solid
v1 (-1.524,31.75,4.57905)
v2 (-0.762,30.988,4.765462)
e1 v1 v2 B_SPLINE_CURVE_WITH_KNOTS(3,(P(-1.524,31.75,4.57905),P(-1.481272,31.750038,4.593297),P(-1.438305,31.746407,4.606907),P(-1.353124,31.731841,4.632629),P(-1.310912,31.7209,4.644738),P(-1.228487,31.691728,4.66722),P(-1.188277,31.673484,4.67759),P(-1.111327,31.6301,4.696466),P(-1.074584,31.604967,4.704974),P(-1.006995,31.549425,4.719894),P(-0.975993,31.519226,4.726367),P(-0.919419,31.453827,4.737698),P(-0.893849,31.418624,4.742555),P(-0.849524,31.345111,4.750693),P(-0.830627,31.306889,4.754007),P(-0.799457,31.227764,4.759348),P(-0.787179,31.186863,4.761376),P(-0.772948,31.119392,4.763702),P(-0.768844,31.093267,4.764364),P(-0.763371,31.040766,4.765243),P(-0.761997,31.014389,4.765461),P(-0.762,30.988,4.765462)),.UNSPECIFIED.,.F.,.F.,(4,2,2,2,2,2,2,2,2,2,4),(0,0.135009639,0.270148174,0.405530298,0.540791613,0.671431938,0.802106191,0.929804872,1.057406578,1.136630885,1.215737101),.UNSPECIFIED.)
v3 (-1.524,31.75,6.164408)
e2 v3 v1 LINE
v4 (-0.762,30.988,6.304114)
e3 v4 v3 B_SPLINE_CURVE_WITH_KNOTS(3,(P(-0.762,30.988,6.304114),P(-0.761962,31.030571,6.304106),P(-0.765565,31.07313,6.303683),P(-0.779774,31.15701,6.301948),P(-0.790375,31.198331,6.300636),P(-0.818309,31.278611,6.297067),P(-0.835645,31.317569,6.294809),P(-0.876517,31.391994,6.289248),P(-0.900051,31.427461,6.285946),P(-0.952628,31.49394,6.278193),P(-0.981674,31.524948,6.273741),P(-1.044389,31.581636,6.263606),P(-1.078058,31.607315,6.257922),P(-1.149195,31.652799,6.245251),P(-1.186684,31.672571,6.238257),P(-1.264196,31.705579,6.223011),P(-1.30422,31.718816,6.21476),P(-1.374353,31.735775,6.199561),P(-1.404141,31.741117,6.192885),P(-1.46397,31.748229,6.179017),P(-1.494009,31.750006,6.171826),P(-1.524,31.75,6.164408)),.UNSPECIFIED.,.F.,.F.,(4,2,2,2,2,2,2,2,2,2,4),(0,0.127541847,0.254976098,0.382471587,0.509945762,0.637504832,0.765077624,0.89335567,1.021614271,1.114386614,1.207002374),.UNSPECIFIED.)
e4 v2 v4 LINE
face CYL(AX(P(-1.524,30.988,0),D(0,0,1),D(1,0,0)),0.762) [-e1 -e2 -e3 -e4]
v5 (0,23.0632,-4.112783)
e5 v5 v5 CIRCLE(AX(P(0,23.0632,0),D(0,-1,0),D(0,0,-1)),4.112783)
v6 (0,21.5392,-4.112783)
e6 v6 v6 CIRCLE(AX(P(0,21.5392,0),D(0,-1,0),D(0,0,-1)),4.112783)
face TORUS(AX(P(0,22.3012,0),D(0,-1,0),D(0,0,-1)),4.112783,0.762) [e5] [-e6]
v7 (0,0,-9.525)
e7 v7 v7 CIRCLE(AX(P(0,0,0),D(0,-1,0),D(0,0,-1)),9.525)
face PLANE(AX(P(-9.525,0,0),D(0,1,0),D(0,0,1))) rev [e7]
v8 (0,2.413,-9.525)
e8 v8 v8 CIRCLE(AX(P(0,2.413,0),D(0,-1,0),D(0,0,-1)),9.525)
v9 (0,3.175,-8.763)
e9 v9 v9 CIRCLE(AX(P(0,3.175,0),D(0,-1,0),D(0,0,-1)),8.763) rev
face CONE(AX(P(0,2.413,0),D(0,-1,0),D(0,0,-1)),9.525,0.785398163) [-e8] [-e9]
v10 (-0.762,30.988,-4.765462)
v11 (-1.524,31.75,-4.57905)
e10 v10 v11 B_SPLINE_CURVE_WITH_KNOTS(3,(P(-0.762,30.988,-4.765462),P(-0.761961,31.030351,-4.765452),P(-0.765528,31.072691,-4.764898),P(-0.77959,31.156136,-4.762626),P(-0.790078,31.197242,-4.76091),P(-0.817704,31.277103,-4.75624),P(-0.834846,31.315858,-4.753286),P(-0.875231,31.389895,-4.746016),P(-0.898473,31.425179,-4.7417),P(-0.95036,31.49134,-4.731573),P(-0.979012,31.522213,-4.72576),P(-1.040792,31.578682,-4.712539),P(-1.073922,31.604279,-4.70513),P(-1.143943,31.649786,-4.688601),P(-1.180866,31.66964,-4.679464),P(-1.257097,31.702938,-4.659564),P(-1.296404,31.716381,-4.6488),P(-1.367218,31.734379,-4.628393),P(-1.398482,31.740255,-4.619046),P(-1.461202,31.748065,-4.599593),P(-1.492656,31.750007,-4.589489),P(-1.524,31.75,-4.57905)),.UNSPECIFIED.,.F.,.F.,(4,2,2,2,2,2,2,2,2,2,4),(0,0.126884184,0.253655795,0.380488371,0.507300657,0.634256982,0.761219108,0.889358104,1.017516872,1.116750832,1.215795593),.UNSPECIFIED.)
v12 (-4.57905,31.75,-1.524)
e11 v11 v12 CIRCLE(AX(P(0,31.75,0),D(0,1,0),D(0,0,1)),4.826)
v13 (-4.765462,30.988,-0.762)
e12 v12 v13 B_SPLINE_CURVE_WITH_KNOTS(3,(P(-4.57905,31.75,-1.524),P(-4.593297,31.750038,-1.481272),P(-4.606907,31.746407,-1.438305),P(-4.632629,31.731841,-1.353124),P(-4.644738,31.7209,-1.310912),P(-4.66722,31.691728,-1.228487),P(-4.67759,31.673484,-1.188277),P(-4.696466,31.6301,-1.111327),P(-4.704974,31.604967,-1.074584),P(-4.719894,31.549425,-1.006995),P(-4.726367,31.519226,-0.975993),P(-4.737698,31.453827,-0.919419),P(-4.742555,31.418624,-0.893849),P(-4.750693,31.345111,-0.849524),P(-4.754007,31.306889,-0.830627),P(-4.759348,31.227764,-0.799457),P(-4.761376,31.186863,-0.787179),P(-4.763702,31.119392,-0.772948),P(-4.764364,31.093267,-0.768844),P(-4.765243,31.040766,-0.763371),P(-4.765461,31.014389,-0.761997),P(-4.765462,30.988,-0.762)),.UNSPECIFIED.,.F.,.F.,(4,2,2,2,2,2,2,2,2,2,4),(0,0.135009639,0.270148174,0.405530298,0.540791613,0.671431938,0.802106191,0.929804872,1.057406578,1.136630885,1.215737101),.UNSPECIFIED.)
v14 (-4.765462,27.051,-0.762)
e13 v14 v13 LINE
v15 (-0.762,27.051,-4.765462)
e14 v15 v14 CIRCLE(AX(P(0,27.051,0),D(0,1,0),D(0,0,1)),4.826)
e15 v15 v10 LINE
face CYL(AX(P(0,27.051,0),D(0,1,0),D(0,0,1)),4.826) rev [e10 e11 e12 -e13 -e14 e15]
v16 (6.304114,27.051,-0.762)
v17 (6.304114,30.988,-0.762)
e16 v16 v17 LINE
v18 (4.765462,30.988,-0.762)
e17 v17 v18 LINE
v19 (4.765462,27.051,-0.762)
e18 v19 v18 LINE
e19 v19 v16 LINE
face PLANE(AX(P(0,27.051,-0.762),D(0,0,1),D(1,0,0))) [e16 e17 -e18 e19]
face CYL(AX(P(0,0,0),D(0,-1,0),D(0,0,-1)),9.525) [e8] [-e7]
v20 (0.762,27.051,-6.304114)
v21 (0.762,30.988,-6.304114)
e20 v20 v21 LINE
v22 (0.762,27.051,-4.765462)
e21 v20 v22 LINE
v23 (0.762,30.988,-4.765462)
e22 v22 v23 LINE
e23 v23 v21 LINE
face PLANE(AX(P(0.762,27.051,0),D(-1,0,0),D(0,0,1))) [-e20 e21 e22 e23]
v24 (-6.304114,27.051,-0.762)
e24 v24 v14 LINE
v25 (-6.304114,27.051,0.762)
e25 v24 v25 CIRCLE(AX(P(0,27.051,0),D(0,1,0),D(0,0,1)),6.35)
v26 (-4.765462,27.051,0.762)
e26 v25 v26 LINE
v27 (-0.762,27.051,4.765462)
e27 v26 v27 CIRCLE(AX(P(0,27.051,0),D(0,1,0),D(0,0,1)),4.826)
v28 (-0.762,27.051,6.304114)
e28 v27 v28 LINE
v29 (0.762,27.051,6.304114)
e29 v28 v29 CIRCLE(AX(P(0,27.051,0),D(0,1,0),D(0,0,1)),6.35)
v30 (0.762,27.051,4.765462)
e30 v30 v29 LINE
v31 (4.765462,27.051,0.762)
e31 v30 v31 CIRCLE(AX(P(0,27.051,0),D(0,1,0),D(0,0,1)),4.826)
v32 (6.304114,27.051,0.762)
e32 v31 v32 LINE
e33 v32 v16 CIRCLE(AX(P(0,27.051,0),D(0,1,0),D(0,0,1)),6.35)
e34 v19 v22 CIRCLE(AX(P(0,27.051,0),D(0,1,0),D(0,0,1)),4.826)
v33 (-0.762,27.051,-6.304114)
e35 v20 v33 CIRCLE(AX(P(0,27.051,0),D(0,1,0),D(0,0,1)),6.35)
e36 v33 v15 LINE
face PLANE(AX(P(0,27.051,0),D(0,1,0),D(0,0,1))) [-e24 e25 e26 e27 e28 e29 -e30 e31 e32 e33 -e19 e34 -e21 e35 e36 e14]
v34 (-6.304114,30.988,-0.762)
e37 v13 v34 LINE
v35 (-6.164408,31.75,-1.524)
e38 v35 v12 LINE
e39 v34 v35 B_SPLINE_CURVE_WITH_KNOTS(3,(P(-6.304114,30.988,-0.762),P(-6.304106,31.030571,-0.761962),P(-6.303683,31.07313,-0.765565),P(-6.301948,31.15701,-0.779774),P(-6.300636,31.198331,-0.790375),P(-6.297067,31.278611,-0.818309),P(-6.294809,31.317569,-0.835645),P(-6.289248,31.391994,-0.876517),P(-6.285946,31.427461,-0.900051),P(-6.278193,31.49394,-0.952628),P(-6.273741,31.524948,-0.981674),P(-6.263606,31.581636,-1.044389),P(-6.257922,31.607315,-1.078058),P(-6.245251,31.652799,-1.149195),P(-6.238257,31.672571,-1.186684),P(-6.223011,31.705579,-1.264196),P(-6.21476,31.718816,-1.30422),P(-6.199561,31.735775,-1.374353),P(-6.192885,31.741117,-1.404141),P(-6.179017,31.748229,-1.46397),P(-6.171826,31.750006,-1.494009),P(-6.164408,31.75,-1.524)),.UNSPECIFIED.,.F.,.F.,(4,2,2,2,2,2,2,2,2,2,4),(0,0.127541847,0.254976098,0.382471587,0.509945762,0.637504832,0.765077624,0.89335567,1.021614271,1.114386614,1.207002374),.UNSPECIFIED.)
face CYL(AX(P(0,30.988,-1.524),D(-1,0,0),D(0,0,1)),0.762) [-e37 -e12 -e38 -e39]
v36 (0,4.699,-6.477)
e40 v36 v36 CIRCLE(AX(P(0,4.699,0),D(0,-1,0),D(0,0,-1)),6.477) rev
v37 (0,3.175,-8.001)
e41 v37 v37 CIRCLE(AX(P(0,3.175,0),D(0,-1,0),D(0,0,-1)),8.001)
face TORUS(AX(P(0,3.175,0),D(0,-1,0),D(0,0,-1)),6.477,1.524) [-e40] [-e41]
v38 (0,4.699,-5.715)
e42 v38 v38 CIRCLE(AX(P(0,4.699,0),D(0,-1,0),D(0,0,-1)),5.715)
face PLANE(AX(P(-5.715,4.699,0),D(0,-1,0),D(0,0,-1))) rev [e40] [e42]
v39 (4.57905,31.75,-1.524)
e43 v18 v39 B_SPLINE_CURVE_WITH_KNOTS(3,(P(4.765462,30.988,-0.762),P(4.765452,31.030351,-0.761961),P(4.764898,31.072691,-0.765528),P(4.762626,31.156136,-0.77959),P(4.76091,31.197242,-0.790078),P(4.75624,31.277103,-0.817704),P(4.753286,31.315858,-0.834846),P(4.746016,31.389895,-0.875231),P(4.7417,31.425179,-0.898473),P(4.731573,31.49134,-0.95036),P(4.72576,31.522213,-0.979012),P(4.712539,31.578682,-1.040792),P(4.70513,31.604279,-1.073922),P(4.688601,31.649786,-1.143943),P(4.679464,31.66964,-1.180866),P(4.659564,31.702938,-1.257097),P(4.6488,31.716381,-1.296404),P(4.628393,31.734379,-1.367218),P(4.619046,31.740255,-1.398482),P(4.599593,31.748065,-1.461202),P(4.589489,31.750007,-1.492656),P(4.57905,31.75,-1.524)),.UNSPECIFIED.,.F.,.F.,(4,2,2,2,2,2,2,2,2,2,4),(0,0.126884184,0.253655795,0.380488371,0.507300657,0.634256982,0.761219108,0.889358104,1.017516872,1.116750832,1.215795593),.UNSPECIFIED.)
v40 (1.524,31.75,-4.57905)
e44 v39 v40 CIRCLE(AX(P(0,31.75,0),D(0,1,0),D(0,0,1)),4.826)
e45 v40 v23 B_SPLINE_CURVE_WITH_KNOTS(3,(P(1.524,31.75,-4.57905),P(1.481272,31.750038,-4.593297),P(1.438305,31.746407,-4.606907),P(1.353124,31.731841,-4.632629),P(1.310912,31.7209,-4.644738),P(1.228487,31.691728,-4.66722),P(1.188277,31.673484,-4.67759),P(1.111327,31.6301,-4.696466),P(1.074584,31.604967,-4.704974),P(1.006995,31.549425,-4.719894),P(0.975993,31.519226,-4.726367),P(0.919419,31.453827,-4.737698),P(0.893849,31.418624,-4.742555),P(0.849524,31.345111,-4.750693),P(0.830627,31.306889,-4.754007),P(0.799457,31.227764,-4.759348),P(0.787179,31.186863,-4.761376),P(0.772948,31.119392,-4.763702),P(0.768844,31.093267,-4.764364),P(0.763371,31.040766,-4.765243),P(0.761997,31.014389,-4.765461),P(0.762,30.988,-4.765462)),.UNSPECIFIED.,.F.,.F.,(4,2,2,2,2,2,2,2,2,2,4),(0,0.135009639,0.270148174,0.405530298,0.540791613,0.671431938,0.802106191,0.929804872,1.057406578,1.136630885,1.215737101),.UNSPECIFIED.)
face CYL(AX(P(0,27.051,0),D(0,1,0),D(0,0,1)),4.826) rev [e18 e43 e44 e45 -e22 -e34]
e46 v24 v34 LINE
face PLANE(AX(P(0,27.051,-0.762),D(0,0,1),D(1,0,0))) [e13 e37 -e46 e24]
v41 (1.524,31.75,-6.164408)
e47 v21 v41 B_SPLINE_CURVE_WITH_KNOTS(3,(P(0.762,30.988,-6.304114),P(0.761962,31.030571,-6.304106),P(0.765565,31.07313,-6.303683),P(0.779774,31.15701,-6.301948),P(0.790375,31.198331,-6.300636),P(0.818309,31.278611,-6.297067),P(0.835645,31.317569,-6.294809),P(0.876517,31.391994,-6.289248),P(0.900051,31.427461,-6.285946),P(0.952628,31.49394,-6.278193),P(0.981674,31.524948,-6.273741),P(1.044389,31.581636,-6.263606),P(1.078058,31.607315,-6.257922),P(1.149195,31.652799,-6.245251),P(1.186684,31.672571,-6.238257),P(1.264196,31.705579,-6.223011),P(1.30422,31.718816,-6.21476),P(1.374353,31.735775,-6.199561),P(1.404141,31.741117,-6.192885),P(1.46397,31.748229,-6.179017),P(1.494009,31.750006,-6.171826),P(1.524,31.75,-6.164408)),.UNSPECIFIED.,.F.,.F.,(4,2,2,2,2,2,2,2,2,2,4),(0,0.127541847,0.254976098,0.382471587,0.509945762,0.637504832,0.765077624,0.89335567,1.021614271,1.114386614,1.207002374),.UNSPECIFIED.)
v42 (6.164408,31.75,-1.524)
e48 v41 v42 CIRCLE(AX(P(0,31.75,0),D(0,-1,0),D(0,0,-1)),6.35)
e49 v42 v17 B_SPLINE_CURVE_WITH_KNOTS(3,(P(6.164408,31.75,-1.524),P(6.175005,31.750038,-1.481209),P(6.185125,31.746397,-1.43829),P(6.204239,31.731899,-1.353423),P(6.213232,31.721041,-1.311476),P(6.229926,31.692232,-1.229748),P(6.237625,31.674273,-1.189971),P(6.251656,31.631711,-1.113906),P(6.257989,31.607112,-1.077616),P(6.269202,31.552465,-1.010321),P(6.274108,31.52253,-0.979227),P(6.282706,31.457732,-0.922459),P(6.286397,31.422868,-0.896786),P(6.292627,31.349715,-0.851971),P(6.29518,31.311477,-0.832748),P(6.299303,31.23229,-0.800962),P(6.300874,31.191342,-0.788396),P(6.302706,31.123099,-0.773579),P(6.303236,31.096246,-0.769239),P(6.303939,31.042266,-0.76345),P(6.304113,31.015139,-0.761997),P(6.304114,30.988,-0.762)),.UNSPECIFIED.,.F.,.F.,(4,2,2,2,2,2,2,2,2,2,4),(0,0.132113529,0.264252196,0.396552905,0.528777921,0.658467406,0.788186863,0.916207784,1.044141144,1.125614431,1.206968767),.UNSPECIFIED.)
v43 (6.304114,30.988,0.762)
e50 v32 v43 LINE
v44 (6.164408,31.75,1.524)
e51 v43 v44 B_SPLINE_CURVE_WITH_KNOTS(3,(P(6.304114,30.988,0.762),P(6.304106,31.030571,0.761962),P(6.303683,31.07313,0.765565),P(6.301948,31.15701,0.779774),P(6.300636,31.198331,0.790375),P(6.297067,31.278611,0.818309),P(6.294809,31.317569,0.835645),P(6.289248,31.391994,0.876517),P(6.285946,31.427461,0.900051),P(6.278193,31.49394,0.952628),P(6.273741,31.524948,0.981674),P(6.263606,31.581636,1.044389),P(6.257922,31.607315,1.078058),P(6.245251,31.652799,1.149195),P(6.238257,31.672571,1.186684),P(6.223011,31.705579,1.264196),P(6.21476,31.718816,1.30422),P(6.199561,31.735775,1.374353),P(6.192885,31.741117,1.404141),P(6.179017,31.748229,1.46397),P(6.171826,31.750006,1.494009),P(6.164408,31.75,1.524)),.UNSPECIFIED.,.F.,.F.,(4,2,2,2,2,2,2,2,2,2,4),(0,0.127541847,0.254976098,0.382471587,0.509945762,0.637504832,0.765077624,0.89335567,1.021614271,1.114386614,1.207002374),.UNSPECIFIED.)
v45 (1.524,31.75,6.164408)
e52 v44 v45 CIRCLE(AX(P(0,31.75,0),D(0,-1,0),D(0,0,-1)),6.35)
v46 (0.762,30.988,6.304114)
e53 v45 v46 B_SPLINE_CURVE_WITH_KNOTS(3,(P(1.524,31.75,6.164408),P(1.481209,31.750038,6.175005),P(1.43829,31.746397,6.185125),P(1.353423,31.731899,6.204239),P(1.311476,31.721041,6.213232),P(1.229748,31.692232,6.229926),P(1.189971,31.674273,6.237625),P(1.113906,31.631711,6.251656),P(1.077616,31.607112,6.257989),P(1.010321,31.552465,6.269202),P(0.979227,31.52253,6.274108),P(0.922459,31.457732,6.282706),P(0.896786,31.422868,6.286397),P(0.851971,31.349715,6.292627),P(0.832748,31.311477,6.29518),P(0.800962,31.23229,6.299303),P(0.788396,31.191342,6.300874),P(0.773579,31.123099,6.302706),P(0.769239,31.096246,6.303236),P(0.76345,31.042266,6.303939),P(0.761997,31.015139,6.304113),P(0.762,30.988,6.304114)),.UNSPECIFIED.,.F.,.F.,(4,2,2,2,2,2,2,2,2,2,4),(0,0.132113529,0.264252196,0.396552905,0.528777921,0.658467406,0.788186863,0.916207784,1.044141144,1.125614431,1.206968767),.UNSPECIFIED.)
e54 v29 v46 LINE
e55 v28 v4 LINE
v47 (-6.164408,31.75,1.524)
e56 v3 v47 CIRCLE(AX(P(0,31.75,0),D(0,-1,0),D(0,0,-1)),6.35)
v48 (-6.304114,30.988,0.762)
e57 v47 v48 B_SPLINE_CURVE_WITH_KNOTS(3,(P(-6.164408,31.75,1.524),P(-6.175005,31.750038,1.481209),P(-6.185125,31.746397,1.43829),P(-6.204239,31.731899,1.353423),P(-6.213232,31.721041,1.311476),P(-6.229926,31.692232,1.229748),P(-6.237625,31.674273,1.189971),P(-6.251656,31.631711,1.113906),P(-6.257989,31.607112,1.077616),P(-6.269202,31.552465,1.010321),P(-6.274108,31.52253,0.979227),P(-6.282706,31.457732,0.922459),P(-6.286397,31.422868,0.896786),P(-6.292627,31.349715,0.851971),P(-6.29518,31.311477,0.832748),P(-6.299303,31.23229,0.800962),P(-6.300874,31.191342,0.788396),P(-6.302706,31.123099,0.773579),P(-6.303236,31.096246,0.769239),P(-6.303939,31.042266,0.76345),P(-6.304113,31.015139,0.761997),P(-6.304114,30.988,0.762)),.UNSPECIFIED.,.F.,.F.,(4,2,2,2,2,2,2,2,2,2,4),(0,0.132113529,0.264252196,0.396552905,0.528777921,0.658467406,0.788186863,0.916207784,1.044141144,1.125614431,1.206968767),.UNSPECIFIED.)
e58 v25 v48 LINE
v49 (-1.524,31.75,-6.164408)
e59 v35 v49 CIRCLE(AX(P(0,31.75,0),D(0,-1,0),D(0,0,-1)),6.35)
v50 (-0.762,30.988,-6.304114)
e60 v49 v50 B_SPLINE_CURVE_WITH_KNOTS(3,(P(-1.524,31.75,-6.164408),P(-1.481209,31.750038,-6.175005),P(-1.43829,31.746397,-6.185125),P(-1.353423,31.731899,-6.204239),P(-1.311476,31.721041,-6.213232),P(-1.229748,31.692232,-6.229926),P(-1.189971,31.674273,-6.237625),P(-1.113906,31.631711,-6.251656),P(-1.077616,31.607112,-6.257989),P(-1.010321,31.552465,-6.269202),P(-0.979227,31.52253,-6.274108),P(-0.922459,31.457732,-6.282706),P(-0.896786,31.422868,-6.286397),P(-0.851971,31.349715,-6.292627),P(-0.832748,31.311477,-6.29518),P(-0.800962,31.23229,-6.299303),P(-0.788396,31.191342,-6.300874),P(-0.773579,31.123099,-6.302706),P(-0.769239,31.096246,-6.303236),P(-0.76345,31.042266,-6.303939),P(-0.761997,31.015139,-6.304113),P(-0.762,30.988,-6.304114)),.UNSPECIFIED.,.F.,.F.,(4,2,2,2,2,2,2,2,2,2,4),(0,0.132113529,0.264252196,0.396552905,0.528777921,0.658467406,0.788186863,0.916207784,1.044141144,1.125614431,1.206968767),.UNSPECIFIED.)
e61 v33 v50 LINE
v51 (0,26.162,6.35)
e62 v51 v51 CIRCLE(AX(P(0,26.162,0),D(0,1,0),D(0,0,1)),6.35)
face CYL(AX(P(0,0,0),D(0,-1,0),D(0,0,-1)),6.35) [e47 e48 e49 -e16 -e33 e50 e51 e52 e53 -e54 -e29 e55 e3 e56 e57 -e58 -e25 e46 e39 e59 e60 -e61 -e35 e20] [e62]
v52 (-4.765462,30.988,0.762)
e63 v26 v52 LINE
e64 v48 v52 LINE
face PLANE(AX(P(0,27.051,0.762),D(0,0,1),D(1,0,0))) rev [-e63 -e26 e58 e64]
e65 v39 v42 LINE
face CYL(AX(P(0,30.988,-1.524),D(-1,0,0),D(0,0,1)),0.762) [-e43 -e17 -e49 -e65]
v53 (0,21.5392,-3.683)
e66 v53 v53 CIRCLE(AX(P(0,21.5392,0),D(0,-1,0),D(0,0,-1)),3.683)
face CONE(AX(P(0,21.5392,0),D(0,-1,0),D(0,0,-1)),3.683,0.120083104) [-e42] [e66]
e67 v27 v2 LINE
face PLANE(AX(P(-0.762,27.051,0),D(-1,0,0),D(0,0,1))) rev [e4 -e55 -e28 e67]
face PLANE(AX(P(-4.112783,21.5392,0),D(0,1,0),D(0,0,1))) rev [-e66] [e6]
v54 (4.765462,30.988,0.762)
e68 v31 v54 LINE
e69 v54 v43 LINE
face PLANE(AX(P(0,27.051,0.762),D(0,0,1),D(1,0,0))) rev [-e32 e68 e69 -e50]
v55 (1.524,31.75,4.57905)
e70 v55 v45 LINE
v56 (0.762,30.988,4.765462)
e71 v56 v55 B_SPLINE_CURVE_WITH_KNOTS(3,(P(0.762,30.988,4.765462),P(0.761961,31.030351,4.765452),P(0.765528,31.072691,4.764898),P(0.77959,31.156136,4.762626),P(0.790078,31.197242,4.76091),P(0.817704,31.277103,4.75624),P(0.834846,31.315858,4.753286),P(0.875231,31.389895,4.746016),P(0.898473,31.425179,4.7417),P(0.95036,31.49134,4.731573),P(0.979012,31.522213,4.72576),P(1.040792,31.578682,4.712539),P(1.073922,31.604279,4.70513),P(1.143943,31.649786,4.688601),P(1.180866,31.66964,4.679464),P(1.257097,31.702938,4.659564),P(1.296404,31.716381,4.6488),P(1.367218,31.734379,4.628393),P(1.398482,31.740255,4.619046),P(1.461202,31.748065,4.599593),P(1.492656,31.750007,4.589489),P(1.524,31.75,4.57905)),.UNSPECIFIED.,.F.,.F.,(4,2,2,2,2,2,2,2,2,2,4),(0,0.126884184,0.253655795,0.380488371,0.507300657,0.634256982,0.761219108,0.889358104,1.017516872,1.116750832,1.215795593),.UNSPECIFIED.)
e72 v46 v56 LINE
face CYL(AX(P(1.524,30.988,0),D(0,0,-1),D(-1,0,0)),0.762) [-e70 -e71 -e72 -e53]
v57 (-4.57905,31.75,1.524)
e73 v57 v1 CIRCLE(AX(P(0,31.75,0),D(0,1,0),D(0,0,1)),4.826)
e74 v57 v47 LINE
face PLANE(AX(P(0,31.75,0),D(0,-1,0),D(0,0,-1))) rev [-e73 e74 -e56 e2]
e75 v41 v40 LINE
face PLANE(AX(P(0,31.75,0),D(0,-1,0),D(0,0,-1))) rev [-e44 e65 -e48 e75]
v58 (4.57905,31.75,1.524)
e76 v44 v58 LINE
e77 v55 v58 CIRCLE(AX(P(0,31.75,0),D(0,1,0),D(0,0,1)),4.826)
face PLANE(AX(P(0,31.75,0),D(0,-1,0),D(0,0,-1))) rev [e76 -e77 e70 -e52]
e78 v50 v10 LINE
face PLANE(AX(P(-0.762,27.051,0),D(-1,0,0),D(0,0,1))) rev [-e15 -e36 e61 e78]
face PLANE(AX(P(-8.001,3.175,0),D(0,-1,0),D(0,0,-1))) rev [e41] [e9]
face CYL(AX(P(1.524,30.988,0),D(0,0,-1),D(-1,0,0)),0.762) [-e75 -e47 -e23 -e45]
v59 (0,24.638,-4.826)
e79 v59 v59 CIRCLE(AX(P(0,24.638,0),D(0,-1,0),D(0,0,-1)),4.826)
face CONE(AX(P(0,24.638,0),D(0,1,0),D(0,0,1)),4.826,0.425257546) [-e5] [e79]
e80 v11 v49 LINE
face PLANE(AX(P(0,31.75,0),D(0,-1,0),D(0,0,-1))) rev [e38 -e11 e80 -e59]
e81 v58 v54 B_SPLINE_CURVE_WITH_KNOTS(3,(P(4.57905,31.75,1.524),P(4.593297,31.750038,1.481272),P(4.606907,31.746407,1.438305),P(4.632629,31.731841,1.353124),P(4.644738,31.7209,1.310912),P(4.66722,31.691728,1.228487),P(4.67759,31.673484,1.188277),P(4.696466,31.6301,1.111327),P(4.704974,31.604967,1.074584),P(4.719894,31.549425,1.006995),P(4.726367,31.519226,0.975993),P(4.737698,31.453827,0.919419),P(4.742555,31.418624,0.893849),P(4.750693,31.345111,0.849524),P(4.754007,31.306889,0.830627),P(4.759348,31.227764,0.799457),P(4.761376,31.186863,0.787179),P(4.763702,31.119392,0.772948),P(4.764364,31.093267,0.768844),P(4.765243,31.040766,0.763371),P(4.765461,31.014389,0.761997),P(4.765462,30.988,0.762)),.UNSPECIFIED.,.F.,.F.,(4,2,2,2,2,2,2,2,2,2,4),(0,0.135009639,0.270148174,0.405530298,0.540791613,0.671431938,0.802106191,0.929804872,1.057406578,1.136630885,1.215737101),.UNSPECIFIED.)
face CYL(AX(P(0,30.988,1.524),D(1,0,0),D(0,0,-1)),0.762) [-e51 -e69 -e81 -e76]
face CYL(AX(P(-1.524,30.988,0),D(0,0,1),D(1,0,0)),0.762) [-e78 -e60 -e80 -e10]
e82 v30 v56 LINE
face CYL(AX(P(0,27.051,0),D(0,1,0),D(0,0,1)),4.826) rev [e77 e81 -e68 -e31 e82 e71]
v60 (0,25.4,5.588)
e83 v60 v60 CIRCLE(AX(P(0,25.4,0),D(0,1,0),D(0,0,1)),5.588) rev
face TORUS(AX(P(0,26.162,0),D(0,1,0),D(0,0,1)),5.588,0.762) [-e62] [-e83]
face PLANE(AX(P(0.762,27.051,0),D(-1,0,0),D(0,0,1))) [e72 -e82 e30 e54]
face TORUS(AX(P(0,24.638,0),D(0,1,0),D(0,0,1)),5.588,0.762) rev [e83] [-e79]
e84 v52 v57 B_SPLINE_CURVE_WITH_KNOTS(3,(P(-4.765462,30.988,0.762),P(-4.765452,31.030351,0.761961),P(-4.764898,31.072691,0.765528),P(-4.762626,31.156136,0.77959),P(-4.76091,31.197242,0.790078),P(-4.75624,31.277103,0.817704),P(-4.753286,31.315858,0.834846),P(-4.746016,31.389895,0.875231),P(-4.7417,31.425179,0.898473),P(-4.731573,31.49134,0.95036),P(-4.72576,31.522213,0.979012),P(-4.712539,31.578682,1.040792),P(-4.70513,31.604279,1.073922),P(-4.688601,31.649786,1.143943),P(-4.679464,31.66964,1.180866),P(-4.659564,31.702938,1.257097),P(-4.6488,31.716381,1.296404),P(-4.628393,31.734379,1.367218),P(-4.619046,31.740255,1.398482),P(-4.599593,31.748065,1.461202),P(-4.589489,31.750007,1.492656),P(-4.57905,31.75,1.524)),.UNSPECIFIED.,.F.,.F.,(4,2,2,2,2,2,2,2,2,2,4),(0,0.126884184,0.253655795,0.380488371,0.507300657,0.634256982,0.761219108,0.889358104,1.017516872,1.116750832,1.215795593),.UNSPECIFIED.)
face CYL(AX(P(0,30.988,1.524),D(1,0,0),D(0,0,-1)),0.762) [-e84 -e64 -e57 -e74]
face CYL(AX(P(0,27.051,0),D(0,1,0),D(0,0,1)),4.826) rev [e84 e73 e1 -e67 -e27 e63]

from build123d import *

# Parameters (mm, degrees)
CHAMFER1_SIZE      = 0.762
FILLET1_R          = 0.762
CUT_EXTRUDE4_START = -4.699
SKETCH2_W          = 1.524
SKETCH2_H          = 1.524
CUT_EXTRUDE4_DEPTH = 4.699
FILLET2_R          = 0.762
FILLET3_R          = 1.524


with BuildPart() as part:
    # Sketch1 → Revolve1 (revolve)
    with BuildSketch(Plane.XY, mode=Mode.PRIVATE) as revolve1_sk:
        with BuildLine():
            Line((0, 0), (0, 31.75))
            Line((0, 31.75), (-6.35, 31.75))
            Line((-6.35, 31.75), (-6.35, 25.4))
            Line((-6.35, 25.4), (-4.826, 25.4))
            Line((-4.826, 25.4), (-4.826, 24.638))
            Line((-4.826, 24.638), (-4.112783335, 23.0632))
            ThreePointArc((-4.112783335, 23.0632), (-4.874783335, 22.3012), (-4.112783335, 21.5392))
            Line((-4.112783335, 21.5392), (-3.683, 21.5392))
            Line((-3.683, 21.5392), (-5.715, 4.699))
            Line((-5.715, 4.699), (-8.001, 4.699))
            Line((-8.001, 4.699), (-8.001, 3.175))
            Line((-8.001, 3.175), (-9.525, 3.175))
            Line((-9.525, 3.175), (-9.525, 0))
            Line((-9.525, 0), (0, 0))
        make_face()
    revolve(revolve1_sk.sketch.rotate(Axis((0, 0, 0), (0, 1, 0)), 270), axis=Axis((0, 0, 0), (0, 1, 0)))

    # Chamfer1
    chamfer1_edges = [part.edges().sort_by_distance(p)[0] for p in [
        (0, 3.175, 9.525),
    ]]
    chamfer(chamfer1_edges, length=CHAMFER1_SIZE)

    # Fillet1
    fillet1_edges = [part.edges().sort_by_distance(p)[0] for p in [
        (0, 25.4, 4.826),
        (0, 25.4, 6.35),
    ]]
    fillet(fillet1_edges, radius=FILLET1_R - 0.0001)  # a hair under: the kernel refuses the full size

    # Sketch2 → Cut-Extrude4 (cut)
    with BuildSketch(Plane(origin=(0, 31.75, 0), x_dir=(1, 0, 0), z_dir=(0, 1, 0)).offset(CUT_EXTRUDE4_START)):
        with BuildLine():
            Line((0.762, 4.765462412), (0.762, 0.762))
            Line((0.762, 0.762), (4.765462412, 0.762))
            ThreePointArc((4.765462412, 0.762), (3.412497326, 3.412497326), (0.762, 4.765462412))
        make_face()
        with BuildLine():
            ThreePointArc((-0.762, 4.765462412), (-3.412497326, 3.412497326), (-4.765462412, 0.762))
            Line((-4.765462412, 0.762), (-0.762, 0.762))
            Line((-0.762, 0.762), (-0.762, 4.765462412))
        make_face()
        with BuildLine():
            Line((-0.762, -0.762), (-4.765462412, -0.762))
            ThreePointArc((-4.765462412, -0.762), (-3.412497326, -3.412497326), (-0.762, -4.765462412))
            Line((-0.762, -4.765462412), (-0.762, -0.762))
        make_face()
        with BuildLine():
            Line((4.765462412, -0.762), (0.762, -0.762))
            Line((0.762, -0.762), (0.762, -4.765462412))
            ThreePointArc((0.762, -4.765462412), (3.412497326, -3.412497326), (4.765462412, -0.762))
        make_face()
        with BuildLine():
            Line((-4.765462412, 0.762), (-6.304114212, 0.762))
            ThreePointArc((-6.304114212, 0.762), (-6.35, 0), (-6.304114212, -0.762))
            Line((-6.304114212, -0.762), (-4.765462412, -0.762))
            ThreePointArc((-4.765462412, -0.762), (-4.826, 0), (-4.765462412, 0.762))
        make_face()
        with BuildLine():
            ThreePointArc((6.35, 0), (6.338518173, 0.381690158), (6.304114212, 0.762))
            Line((6.304114212, 0.762), (4.765462412, 0.762))
            ThreePointArc((4.765462412, 0.762), (4.810841797, 0.382200471), (4.826, 0))
            ThreePointArc((4.826, 0), (4.810841797, -0.382200471), (4.765462412, -0.762))
            Line((4.765462412, -0.762), (6.304114212, -0.762))
            ThreePointArc((6.304114212, -0.762), (6.338518173, -0.381690158), (6.35, 0))
        make_face()
        with BuildLine():
            ThreePointArc((0.762, 6.304114212), (0, 6.35), (-0.762, 6.304114212))
            Line((-0.762, 6.304114212), (-0.762, 4.765462412))
            ThreePointArc((-0.762, 4.765462412), (0, 4.826), (0.762, 4.765462412))
            Line((0.762, 4.765462412), (0.762, 6.304114212))
        make_face()
        with BuildLine():
            Line((-0.762, -4.765462412), (-0.762, -6.304114212))
            ThreePointArc((-0.762, -6.304114212), (0, -6.35), (0.762, -6.304114212))
            Line((0.762, -6.304114212), (0.762, -4.765462412))
            ThreePointArc((0.762, -4.765462412), (0, -4.826), (-0.762, -4.765462412))
        make_face()
        with BuildLine():
            Line((0.762, -0.762), (-0.762, -0.762))
            Line((-0.762, -0.762), (-0.762, -4.765462412))
            ThreePointArc((-0.762, -4.765462412), (0, -4.826), (0.762, -4.765462412))
            Line((0.762, -4.765462412), (0.762, -0.762))
        make_face()
        Rectangle(SKETCH2_W, SKETCH2_H)
        with BuildLine():
            Line((-0.762, 0.762), (-4.765462412, 0.762))
            ThreePointArc((-4.765462412, 0.762), (-4.826, 0), (-4.765462412, -0.762))
            Line((-4.765462412, -0.762), (-0.762, -0.762))
            Line((-0.762, -0.762), (-0.762, 0.762))
        make_face()
        with BuildLine():
            Line((-0.762, 4.765462412), (-0.762, 0.762))
            Line((-0.762, 0.762), (0.762, 0.762))
            Line((0.762, 0.762), (0.762, 4.765462412))
            ThreePointArc((0.762, 4.765462412), (0, 4.826), (-0.762, 4.765462412))
        make_face()
        with BuildLine():
            Line((4.765462412, 0.762), (0.762, 0.762))
            Line((0.762, 0.762), (0.762, -0.762))
            Line((0.762, -0.762), (4.765462412, -0.762))
            ThreePointArc((4.765462412, -0.762), (4.810841797, -0.382200471), (4.826, 0))
            ThreePointArc((4.826, 0), (4.810841797, 0.382200471), (4.765462412, 0.762))
        make_face()
    extrude(amount=CUT_EXTRUDE4_DEPTH, mode=Mode.SUBTRACT)

    # Fillet2
    fillet2_edges = [part.edges().sort_by_distance(p)[0] for p in [
        (5.534788312, 31.75, -0.762),
        (0.762, 31.75, 5.534788312),
        (-5.534788312, 31.75, -0.762),
        (0.762, 31.75, -5.534788312),
        (-0.762, 31.75, -5.534788312),
        (-5.534788312, 31.75, 0.762),
        (-0.762, 31.75, 5.534788312),
        (5.534788312, 31.75, 0.762),
    ]]
    fillet(fillet2_edges, radius=FILLET2_R)

    # Fillet3
    fillet3_edges = [part.edges().sort_by_distance(p)[0] for p in [
        (0, 4.699, 8.001),
    ]]
    fillet(fillet3_edges, radius=FILLET3_R - 0.0001)  # a hair under: the kernel refuses the full size


solid = part.part
